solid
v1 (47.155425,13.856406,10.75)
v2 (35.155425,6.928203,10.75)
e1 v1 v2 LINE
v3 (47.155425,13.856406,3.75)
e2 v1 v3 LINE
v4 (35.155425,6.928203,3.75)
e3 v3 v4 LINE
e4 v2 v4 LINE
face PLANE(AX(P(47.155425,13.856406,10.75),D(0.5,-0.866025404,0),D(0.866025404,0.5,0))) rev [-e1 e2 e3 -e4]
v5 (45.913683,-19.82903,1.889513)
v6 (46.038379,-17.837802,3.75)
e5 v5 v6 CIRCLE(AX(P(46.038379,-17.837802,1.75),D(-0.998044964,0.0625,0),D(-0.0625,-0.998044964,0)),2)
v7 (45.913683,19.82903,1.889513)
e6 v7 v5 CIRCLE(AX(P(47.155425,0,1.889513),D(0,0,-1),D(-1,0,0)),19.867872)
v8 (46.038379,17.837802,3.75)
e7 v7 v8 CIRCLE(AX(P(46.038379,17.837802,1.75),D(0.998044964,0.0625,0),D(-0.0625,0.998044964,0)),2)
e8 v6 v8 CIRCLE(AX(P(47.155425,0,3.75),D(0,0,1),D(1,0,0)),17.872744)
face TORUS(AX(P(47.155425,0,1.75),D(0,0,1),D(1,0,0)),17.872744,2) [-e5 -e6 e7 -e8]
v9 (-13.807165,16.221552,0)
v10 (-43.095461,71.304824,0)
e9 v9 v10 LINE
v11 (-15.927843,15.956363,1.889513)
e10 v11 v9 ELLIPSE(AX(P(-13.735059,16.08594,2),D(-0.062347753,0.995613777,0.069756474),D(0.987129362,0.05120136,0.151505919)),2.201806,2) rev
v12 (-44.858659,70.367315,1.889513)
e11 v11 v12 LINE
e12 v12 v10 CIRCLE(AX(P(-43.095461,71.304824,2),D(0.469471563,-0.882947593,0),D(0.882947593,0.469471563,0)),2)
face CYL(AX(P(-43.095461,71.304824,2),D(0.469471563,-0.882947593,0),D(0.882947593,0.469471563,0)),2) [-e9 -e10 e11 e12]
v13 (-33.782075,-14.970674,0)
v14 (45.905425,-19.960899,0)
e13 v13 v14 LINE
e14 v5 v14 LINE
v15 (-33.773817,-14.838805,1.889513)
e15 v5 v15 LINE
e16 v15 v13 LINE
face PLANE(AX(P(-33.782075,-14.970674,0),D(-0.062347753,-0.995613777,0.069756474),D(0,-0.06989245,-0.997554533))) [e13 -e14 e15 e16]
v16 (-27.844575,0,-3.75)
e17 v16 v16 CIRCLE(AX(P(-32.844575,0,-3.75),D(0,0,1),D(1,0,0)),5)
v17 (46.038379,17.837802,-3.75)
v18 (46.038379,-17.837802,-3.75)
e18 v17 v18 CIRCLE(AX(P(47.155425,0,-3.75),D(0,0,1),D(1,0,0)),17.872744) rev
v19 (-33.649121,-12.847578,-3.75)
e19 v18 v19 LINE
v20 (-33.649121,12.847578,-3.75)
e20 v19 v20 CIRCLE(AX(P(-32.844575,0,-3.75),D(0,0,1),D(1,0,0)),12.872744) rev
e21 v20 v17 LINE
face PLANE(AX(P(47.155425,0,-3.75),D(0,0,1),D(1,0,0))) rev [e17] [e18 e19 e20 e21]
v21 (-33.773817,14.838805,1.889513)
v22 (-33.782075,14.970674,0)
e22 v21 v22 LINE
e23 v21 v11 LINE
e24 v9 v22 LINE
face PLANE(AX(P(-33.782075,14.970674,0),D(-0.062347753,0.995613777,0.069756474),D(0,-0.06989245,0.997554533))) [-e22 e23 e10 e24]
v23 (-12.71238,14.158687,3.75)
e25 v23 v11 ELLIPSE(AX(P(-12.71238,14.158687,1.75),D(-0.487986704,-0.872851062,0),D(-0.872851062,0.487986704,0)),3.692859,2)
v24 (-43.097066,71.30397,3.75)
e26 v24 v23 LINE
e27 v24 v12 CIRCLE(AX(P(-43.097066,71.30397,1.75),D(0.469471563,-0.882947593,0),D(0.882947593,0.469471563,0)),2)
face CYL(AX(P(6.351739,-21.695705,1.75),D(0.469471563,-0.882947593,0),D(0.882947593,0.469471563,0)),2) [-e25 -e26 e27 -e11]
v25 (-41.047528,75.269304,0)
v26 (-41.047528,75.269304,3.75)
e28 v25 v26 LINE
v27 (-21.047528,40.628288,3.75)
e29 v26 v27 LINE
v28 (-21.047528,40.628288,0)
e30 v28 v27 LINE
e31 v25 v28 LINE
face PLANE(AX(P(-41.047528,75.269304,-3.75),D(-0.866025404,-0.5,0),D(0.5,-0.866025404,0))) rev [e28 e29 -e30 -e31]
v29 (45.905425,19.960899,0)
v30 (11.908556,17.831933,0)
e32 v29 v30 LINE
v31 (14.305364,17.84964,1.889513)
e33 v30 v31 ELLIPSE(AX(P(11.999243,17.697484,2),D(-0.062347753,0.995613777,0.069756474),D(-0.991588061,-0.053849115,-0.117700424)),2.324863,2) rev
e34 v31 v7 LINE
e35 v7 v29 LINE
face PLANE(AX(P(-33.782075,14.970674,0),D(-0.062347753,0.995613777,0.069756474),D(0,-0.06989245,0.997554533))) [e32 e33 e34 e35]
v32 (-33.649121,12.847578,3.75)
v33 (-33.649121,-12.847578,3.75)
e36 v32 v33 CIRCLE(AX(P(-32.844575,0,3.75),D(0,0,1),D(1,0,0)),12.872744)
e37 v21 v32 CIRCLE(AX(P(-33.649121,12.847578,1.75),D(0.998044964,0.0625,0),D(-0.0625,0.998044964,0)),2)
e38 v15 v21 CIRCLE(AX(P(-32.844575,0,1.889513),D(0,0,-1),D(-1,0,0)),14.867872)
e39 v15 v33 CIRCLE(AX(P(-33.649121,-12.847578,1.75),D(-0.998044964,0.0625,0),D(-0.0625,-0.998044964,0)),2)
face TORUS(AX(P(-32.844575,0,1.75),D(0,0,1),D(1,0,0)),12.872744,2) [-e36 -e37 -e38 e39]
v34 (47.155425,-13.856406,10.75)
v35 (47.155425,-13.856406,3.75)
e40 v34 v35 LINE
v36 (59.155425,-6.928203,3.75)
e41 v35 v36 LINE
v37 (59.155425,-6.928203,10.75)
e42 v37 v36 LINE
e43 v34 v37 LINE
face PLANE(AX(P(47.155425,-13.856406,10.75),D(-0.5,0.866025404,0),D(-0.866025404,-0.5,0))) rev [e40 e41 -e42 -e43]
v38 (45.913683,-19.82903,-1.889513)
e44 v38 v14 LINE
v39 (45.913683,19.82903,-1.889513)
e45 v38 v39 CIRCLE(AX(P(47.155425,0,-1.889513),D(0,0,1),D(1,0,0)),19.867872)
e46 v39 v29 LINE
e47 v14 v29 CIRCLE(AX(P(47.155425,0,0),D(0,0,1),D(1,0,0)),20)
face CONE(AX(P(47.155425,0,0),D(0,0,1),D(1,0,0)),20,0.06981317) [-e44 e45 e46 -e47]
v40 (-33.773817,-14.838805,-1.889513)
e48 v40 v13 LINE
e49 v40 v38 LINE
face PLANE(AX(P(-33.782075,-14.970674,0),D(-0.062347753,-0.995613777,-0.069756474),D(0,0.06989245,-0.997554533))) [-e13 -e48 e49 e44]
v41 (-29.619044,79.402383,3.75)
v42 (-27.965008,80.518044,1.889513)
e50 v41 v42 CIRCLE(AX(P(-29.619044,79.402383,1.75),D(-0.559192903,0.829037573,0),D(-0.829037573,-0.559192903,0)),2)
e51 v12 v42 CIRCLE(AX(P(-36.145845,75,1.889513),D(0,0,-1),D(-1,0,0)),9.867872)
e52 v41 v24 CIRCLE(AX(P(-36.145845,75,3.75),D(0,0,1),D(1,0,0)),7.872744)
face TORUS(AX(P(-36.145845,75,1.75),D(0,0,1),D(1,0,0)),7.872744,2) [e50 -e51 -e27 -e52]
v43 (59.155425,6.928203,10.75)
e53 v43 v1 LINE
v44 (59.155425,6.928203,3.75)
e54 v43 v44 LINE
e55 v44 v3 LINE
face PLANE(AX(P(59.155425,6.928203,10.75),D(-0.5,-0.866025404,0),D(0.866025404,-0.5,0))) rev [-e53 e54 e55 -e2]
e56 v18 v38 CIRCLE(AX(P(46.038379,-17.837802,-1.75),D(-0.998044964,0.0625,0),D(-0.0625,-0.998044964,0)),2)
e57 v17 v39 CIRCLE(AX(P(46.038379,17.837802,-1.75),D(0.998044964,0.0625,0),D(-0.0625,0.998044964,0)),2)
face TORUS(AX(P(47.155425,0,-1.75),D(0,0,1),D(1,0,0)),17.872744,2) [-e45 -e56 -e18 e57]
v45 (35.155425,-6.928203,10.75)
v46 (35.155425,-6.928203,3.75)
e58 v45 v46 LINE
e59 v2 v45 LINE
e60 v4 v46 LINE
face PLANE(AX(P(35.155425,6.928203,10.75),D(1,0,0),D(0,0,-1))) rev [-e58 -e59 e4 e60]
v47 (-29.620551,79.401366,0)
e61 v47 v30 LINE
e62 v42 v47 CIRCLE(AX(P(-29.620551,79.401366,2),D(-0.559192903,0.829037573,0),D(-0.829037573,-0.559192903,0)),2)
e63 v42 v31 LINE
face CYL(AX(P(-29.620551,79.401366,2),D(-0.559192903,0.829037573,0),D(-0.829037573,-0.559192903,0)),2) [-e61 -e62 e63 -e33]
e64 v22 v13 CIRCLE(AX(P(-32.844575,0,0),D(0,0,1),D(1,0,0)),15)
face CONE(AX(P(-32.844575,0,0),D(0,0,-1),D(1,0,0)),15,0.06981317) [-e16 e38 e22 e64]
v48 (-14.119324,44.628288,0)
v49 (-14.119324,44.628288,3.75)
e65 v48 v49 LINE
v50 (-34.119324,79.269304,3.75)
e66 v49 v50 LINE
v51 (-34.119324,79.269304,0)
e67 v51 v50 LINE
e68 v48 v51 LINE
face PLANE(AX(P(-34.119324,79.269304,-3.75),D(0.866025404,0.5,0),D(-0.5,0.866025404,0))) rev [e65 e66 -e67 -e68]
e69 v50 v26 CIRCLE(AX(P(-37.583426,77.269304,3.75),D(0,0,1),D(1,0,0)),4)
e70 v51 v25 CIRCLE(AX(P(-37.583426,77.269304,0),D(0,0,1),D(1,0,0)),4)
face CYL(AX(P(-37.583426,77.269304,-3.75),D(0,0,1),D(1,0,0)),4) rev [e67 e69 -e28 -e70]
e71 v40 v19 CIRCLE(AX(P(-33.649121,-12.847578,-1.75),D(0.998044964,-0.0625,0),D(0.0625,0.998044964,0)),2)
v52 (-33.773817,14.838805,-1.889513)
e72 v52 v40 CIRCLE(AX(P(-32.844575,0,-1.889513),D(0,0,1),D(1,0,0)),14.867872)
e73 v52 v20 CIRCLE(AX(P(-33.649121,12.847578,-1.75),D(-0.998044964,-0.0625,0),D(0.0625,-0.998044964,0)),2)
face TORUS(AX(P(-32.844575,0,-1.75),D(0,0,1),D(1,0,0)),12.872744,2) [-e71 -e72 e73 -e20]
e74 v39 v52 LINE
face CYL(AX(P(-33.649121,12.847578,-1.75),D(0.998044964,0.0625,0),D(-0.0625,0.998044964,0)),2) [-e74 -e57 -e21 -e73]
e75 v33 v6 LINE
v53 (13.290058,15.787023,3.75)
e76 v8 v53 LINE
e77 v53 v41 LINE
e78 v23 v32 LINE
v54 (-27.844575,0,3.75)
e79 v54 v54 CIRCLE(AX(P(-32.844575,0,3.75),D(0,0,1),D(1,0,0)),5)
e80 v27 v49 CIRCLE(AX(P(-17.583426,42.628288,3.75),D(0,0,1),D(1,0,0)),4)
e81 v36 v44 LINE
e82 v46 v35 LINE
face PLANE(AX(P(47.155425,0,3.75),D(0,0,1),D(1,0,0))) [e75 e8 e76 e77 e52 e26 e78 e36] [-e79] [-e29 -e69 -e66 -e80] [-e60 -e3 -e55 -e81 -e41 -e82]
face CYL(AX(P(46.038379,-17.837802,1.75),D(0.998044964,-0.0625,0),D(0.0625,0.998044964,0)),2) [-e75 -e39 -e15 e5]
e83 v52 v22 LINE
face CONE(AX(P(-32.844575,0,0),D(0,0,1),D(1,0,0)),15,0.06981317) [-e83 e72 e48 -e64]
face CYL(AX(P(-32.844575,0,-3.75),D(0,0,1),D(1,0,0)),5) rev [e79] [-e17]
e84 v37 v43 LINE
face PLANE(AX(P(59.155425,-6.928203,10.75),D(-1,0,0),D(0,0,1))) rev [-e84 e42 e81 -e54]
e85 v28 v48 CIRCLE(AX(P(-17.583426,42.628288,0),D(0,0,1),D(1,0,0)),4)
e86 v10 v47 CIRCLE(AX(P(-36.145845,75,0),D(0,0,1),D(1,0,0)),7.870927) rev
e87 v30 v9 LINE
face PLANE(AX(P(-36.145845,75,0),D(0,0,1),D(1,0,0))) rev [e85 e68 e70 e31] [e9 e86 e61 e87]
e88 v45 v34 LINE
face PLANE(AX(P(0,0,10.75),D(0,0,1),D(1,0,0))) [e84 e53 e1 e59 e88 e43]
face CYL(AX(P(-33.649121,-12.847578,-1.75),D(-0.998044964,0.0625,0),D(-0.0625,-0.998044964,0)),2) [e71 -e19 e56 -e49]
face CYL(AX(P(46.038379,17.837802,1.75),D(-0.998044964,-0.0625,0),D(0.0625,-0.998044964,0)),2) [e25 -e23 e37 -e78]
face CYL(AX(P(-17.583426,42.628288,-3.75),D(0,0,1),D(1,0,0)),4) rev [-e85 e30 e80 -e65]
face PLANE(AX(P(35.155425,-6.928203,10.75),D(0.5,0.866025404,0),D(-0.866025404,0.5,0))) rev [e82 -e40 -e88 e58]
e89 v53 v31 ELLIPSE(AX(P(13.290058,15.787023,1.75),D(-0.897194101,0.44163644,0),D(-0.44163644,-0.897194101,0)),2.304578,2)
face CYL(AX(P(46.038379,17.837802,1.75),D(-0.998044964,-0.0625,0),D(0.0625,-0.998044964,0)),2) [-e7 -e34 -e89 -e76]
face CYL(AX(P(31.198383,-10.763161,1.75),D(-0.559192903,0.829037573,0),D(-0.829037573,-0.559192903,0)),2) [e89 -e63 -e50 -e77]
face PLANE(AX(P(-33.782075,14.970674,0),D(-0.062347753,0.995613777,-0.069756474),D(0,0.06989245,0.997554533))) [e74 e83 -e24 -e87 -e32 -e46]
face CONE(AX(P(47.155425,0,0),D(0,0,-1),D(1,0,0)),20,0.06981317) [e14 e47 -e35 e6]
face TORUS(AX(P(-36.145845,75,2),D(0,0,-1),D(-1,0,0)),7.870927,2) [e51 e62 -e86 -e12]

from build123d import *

# Parameters (mm, degrees)
EXTRUDE_313_DEPTH           = 3.75
EXTRUDE_313_TAPER           = 4.000000000000009
EXTRUDE_313_OTHER_WAY_DEPTH = 3.75
EXTRUDE_313_OTHER_WAY_TAPER = 4.000000000000009
EXTRUDE_604_DEPTH           = 3.75
EXTRUDE_604_TAPER           = 4.000000000000009
CUT_EXTRUDE_1_DEPTH         = 109.586836915909
SKETCH_4_R                  = 5.000000000000001
CUT_EXTRUDE_2_DEPTH         = 109.586836915909
EXTRUDE_4_DEPTH             = 7
FILLET_1_R                  = 2
FILLET_2_R                  = 2


with BuildPart() as part:
    # Эскиз1 → Extrude 313 (new body)
    with BuildSketch(Plane.XY):
        with BuildLine():
            ThreePointArc((-33.78207478005865, 14.970674458754354), (-47.84457478005865, 1.84e-15), (-33.78207478005865, -14.970674458754353))
            Line((-33.78207478005865, -14.970674458754353), (45.90542521994135, -19.960899278339138))
            ThreePointArc((45.90542521994135, -19.960899278339138), (67.15542521994135, 0), (45.90542521994135, 19.96089927833915))
            Line((45.90542521994135, 19.96089927833915), (-33.78207478005865, 14.970674458754354))
        make_face()
    extrude(amount=EXTRUDE_313_DEPTH, taper=EXTRUDE_313_TAPER)

    # Эскиз1 → Extrude 313 other way (add)
    with BuildSketch(Plane.XY):
        with BuildLine():
            ThreePointArc((-33.78207478005865, 14.970674458754354), (-47.84457478005865, 1.84e-15), (-33.78207478005865, -14.970674458754353))
            Line((-33.78207478005865, -14.970674458754353), (45.90542521994135, -19.960899278339138))
            ThreePointArc((45.90542521994135, -19.960899278339138), (67.15542521994135, 0), (45.90542521994135, 19.96089927833915))
            Line((45.90542521994135, 19.96089927833915), (-33.78207478005865, 14.970674458754354))
        make_face()
    extrude(amount=-EXTRUDE_313_OTHER_WAY_DEPTH, taper=EXTRUDE_313_OTHER_WAY_TAPER)

    # Эскиз2 → Extrude 604 (add, through all)
    with BuildSketch(Plane.XY):
        with BuildLine():
            Line((-44.97532089787029, 70.30528437214097), (-7.5933381015594845, 6.94e-15))
            Line((-7.5933381015594845, 6.94e-15), (26.39163556671457, 0.16728878792131394))
            Line((26.39163556671457, 0.16728878792131394), (-27.855469243730653, 80.59192903470745))
            ThreePointArc((-27.855469243730653, 80.59192903470745), (-41.29622571838166, 83.57167300702109), (-44.97532089787029, 70.30528437214097))
        make_face()
    extrude(amount=EXTRUDE_604_DEPTH, taper=EXTRUDE_604_TAPER)

    # Эскиз3 → Вырез-Вытянуть1 (cut, through all)
    with BuildSketch(Plane.XY.offset(3.75)):
        with BuildLine():
            Line((-34.119324442658446, 79.26930388139459), (-14.119324442658357, 44.62828773001714))
            ThreePointArc((-14.119324442658357, 44.62828773001714), (-15.58342605779593, 39.16418611487918), (-21.04752767293403, 40.62828773001693))
            Line((-21.04752767293403, 40.62828773001693), (-41.04752767293395, 75.26930388139452))
            ThreePointArc((-41.04752767293395, 75.26930388139452), (-39.583426057796224, 80.73340549653236), (-34.119324442658446, 79.26930388139459))
        make_face()
    extrude(amount=-CUT_EXTRUDE_1_DEPTH, mode=Mode.SUBTRACT)

    # Эскиз4 → Вырез-Вытянуть2 (cut, through all)
    with BuildSketch(Plane.XY.offset(3.75)):
        with Locations((-32.84457478005865, 0)):
            Circle(SKETCH_4_R)
    extrude(amount=-CUT_EXTRUDE_2_DEPTH, mode=Mode.SUBTRACT)

    # Эскиз6 → Бобышка-Вытянуть4 (add)
    with BuildSketch(Plane.XY.offset(3.75)):
        Polygon((47.15542521994136, 13.85640646055103), (35.15542521994135, 6.928203230275517), (35.15542521994135, -6.928203230275513), (47.15542521994134, -13.856406460551026), (59.15542521994136, -6.928203230275509), (59.15542521994136, 6.9282032302755185), align=None)
    extrude(amount=EXTRUDE_4_DEPTH)

    # Скругление1
    fillet_1_edges = [part.edges().sort_by_distance(p)[0] for p in [
        (-47.582349235270485, -7.8e-16, -3.75),
        (66.8931996751532, 7.99e-15, 3.7499999999999996),
        (30.080486304539015, 18.707163953539766, 3.75),
        (-47.582349235270485, 2.33e-15, 3.7499999999999996),
        (6.078064316490606, -17.204073984160548, 3.7500000000000004),
        (6.078064316490607, -17.204073984160537, -3.75),
        (-24.741927783764027, 15.274051213737346, 3.7499999999999996),
        (-6.916852890128096, 49.0802179420399, 3.7500000000000058),
        (-41.16116957860173, 83.34690184461988, 3.7499999999999996),
        (-30.23097968416606, 43.13376633078081, 3.750000000000007),
        (66.89319967515318, -5.55e-15, -3.75),
        (6.078064316490607, 17.20407398416054, -3.75),
    ]]
    fillet(fillet_1_edges, radius=FILLET_1_R)

    # Скругление2
    # the kernel refuses this fillet: 2 mm, written as the material it takes off along each edge
    with BuildSketch(Plane(origin=(-44.97532089787029, 70.30528437214097, 0), x_dir=(0.06159131057865614, 0.03274868074306383, 0.9975640502598279), z_dir=(0.46947156278590146, -0.8829475928589213, 0))) as fillet_2_piece_1_section:
        with BuildLine():
            CenterArc((2.1436447558512195, -1.98437417397325), FILLET_2_R, 97.16683307666736, 86.83316692332966)
            Line((0.1485166553315637, -2.123887121461397), (0.10861409332117057, -2.12667738041116))
            Line((0.10861409332117057, -2.12667738041116), (-0.03990256201039311, -0.00279025894976294))
            Line((-0.03990256201039311, -0.00279025894976294), (1.96e-15, 0.04000000000000188))
            ThreePointArc((1.96e-15, 0.04000000000000188), (0.9470634727645385, 0.04000000000004966), (1.8891365893226297, 0.03968748347946698))
            Line((1.8891365893226297, 0.03968748347946698), (1.894126945529073, 0))
        make_face()
    fillet_2_piece_1 = extrude(amount=66.74180982875873, mode=Mode.PRIVATE)
    fillet_2_piece_1 = split(fillet_2_piece_1, bisect_by=Plane(origin=(-41.49695385970438, 14.76021709060138, 3.8916978839733556), z_dir=(-0.06234775314123914, 0.9956137765464197, -0.06975647374412589)), keep=Keep.TOP, mode=Mode.PRIVATE)
    with BuildSketch(Plane(origin=(-44.97532089787029, 70.30528437214097, 0), x_dir=(0.06159131057865614, 0.03274868074306383, 0.9975640502598279), z_dir=(0.46947156278590146, -0.8829475928589213, 0))) as fillet_2_piece_2_section:
        with BuildLine():
            CenterArc((2.1436447558512195, -1.98437417397325), FILLET_2_R, 97.16683307666736, 86.83316692332966)
            Line((0.1485166553315637, -2.123887121461397), (0.10861409332117057, -2.12667738041116))
            Line((0.10861409332117057, -2.12667738041116), (-0.03990256201039311, -0.00279025894976294))
            Line((-0.03990256201039311, -0.00279025894976294), (1.96e-15, 0.04000000000000188))
            ThreePointArc((1.96e-15, 0.04000000000000188), (0.9470634727645385, 0.04000000000004966), (1.8891365893226297, 0.03968748347946698))
            Line((1.8891365893226297, 0.03968748347946698), (1.894126945529073, 0))
        make_face()
    fillet_2_piece_2 = extrude(amount=66.74180982875873, mode=Mode.PRIVATE)
    fillet_2_piece_2 = split(fillet_2_piece_2, bisect_by=Plane(origin=(-41.49695385970437, 14.760217090601344, -3.891697883973335), z_dir=(-0.062347753141239255, 0.9956137765464199, 0.0697564737441255)), keep=Keep.TOP, mode=Mode.PRIVATE)
    fillet_2_piece_2 = split(fillet_2_piece_2, bisect_by=Plane(origin=(-41.49695385970438, 14.76021709060138, 3.8916978839733556), z_dir=(0.06234775314123914, -0.9956137765464197, 0.06975647374412589)), keep=Keep.TOP, mode=Mode.PRIVATE)
    with BuildSketch(Plane(origin=(-44.97532089787029, 70.30528437214097, 0), x_dir=(0.06159131057865614, 0.03274868074306383, 0.9975640502598279), z_dir=(0.46947156278590146, -0.8829475928589213, 0))) as fillet_2_piece_3_section:
        with BuildLine():
            CenterArc((2.1436447558512195, -1.98437417397325), FILLET_2_R, 97.16683307666736, 86.83316692332966)
            Line((0.1485166553315637, -2.123887121461397), (0.10861409332117057, -2.12667738041116))
            Line((0.10861409332117057, -2.12667738041116), (-0.03990256201039311, -0.00279025894976294))
            Line((-0.03990256201039311, -0.00279025894976294), (1.96e-15, 0.04000000000000188))
            ThreePointArc((1.96e-15, 0.04000000000000188), (0.9470634727645385, 0.04000000000004966), (1.8891365893226297, 0.03968748347946698))
            Line((1.8891365893226297, 0.03968748347946698), (1.894126945529073, 0))
        make_face()
    fillet_2_piece_3 = extrude(amount=66.74180982875873, mode=Mode.PRIVATE)
    fillet_2_piece_3 = split(fillet_2_piece_3, bisect_by=Plane(origin=(-41.49695385970437, 14.760217090601344, -3.891697883973335), z_dir=(0.062347753141239255, -0.9956137765464199, -0.0697564737441255)), keep=Keep.TOP, mode=Mode.PRIVATE)
    fillet_2_piece_3 = split(fillet_2_piece_3, bisect_by=Plane(origin=(-41.49695385970438, 14.760217090601387, 3.8916978839733547), z_dir=(-0.06234775314123914, 0.9956137765464197, -0.06975647374412589)), keep=Keep.TOP, mode=Mode.PRIVATE)
    with BuildSketch(Plane(origin=(-36.14584496928108, 74.99999999999999, 0), x_dir=(0.8290375725550423, 0.559192903470746, 0), z_dir=(0.559192903470746, -0.8290375725550423, 0))) as fillet_2_piece_4:
        with BuildLine():
            CenterArc((7.870930249758116, 2), FILLET_2_R, 270, 86.83316692332944)
            Line((9.867876070562296, 1.8895129474882502), (9.907814986978373, 1.887303206438015))
            ThreePointArc((9.907814986978373, 1.887303206438015), (9.973838762709134, 0.9475466044073921), (10.039902562010383, 0.00279025894976502))
            Line((10.039902562010383, 0.00279025894976502), (9.999999999999998, -0.04))
            Line((9.999999999999998, -0.04), (7.870930249758116, -0.04))
            Line((7.870930249758116, -0.04), (7.870930249758116, 0))
        make_face()
    fillet_2_piece_4_solid = revolve(axis=Axis((-36.14584496928108, 74.99999999999999, 0), (0, 0, 1)), revolution_arc=174.00000000000074, mode=Mode.PRIVATE)
    with BuildSketch(Plane(origin=(17.34900989046163, 13.5735326684051, 0), x_dir=(-0.057830737662793216, -0.03900732508883394, 0.9975640502598272), z_dir=(-0.5591929034707452, 0.8290375725550428, 0))) as fillet_2_piece_5_section:
        with BuildLine():
            CenterArc((2.1436447558512377, -1.9843741739732534), FILLET_2_R, 97.16683307666793, 86.8331669233296)
            Line((0.14851665533158329, -2.1238871214614172), (0.1086140933211902, -2.1266773804111807))
            Line((0.1086140933211902, -2.1266773804111807), (-0.03990256201039322, -0.00279025894976136))
            Line((-0.03990256201039322, -0.00279025894976136), (1.63e-15, 0.04000000000000167))
            ThreePointArc((1.63e-15, 0.04000000000000167), (0.9470634727645375, 0.04000000000004274), (1.8891365893226273, 0.03968748347946384))
            Line((1.8891365893226273, 0.03968748347946384), (1.8941269455290706, 2e-17))
        make_face()
    fillet_2_piece_5 = extrude(amount=80.8387925769827, mode=Mode.PRIVATE)
    fillet_2_piece_5 = split(fillet_2_piece_5, bisect_by=Plane(origin=(17.06352440073483, 18.13237035309626, 0.31940944244362984), z_dir=(-0.062347753141239255, 0.9956137765464199, 0.0697564737441255)), keep=Keep.TOP, mode=Mode.PRIVATE)
    fillet_2_piece_5 = split(fillet_2_piece_5, bisect_by=Plane(origin=(17.06352440073483, 18.132370353096263, -0.31940944244363195), z_dir=(0.06234775314123914, -0.9956137765464197, 0.06975647374412589)), keep=Keep.TOP, mode=Mode.PRIVATE)
    with BuildSketch(Plane(origin=(17.34900989046163, 13.5735326684051, 0), x_dir=(-0.057830737662793216, -0.03900732508883394, 0.9975640502598272), z_dir=(-0.5591929034707452, 0.8290375725550428, 0))) as fillet_2_piece_6_section:
        with BuildLine():
            CenterArc((2.1436447558512377, -1.9843741739732534), FILLET_2_R, 97.16683307666793, 86.8331669233296)
            Line((0.14851665533158329, -2.1238871214614172), (0.1086140933211902, -2.1266773804111807))
            Line((0.1086140933211902, -2.1266773804111807), (-0.03990256201039322, -0.00279025894976136))
            Line((-0.03990256201039322, -0.00279025894976136), (1.63e-15, 0.04000000000000167))
            ThreePointArc((1.63e-15, 0.04000000000000167), (0.9470634727645375, 0.04000000000004274), (1.8891365893226273, 0.03968748347946384))
            Line((1.8891365893226273, 0.03968748347946384), (1.8941269455290706, 2e-17))
        make_face()
    fillet_2_piece_6 = extrude(amount=80.8387925769827, mode=Mode.PRIVATE)
    fillet_2_piece_6 = split(fillet_2_piece_6, bisect_by=Plane(origin=(17.06352440073483, 18.132370353096263, 0.31940944244363006), z_dir=(0.062347753141239255, -0.9956137765464199, -0.0697564737441255)), keep=Keep.TOP, mode=Mode.PRIVATE)
    fillet_2_piece_6 = split(fillet_2_piece_6, bisect_by=Plane(origin=(17.06352440073483, 18.132370353096263, -0.31940944244363195), z_dir=(-0.06234775314123914, 0.9956137765464197, -0.06975647374412589)), keep=Keep.TOP, mode=Mode.PRIVATE)
    with BuildSketch(Plane(origin=(17.34900989046163, 13.5735326684051, 0), x_dir=(-0.057830737662793216, -0.03900732508883394, 0.9975640502598272), z_dir=(-0.5591929034707452, 0.8290375725550428, 0))) as fillet_2_piece_7_section:
        with BuildLine():
            CenterArc((2.1436447558512377, -1.9843741739732534), FILLET_2_R, 97.16683307666793, 86.8331669233296)
            Line((0.14851665533158329, -2.1238871214614172), (0.1086140933211902, -2.1266773804111807))
            Line((0.1086140933211902, -2.1266773804111807), (-0.03990256201039322, -0.00279025894976136))
            Line((-0.03990256201039322, -0.00279025894976136), (1.63e-15, 0.04000000000000167))
            ThreePointArc((1.63e-15, 0.04000000000000167), (0.9470634727645375, 0.04000000000004274), (1.8891365893226273, 0.03968748347946384))
            Line((1.8891365893226273, 0.03968748347946384), (1.8941269455290706, 2e-17))
        make_face()
    fillet_2_piece_7 = extrude(amount=80.8387925769827, mode=Mode.PRIVATE)
    fillet_2_piece_7 = split(fillet_2_piece_7, bisect_by=Plane(origin=(17.06352440073483, 18.132370353096263, -0.31940944244363195), z_dir=(-0.06234775314123914, 0.9956137765464197, -0.06975647374412589)), keep=Keep.TOP, mode=Mode.PRIVATE)
    add([fillet_2_piece_1, fillet_2_piece_2, fillet_2_piece_3, fillet_2_piece_4_solid, fillet_2_piece_5, fillet_2_piece_6, fillet_2_piece_7], mode=Mode.SUBTRACT)


solid = part.part
